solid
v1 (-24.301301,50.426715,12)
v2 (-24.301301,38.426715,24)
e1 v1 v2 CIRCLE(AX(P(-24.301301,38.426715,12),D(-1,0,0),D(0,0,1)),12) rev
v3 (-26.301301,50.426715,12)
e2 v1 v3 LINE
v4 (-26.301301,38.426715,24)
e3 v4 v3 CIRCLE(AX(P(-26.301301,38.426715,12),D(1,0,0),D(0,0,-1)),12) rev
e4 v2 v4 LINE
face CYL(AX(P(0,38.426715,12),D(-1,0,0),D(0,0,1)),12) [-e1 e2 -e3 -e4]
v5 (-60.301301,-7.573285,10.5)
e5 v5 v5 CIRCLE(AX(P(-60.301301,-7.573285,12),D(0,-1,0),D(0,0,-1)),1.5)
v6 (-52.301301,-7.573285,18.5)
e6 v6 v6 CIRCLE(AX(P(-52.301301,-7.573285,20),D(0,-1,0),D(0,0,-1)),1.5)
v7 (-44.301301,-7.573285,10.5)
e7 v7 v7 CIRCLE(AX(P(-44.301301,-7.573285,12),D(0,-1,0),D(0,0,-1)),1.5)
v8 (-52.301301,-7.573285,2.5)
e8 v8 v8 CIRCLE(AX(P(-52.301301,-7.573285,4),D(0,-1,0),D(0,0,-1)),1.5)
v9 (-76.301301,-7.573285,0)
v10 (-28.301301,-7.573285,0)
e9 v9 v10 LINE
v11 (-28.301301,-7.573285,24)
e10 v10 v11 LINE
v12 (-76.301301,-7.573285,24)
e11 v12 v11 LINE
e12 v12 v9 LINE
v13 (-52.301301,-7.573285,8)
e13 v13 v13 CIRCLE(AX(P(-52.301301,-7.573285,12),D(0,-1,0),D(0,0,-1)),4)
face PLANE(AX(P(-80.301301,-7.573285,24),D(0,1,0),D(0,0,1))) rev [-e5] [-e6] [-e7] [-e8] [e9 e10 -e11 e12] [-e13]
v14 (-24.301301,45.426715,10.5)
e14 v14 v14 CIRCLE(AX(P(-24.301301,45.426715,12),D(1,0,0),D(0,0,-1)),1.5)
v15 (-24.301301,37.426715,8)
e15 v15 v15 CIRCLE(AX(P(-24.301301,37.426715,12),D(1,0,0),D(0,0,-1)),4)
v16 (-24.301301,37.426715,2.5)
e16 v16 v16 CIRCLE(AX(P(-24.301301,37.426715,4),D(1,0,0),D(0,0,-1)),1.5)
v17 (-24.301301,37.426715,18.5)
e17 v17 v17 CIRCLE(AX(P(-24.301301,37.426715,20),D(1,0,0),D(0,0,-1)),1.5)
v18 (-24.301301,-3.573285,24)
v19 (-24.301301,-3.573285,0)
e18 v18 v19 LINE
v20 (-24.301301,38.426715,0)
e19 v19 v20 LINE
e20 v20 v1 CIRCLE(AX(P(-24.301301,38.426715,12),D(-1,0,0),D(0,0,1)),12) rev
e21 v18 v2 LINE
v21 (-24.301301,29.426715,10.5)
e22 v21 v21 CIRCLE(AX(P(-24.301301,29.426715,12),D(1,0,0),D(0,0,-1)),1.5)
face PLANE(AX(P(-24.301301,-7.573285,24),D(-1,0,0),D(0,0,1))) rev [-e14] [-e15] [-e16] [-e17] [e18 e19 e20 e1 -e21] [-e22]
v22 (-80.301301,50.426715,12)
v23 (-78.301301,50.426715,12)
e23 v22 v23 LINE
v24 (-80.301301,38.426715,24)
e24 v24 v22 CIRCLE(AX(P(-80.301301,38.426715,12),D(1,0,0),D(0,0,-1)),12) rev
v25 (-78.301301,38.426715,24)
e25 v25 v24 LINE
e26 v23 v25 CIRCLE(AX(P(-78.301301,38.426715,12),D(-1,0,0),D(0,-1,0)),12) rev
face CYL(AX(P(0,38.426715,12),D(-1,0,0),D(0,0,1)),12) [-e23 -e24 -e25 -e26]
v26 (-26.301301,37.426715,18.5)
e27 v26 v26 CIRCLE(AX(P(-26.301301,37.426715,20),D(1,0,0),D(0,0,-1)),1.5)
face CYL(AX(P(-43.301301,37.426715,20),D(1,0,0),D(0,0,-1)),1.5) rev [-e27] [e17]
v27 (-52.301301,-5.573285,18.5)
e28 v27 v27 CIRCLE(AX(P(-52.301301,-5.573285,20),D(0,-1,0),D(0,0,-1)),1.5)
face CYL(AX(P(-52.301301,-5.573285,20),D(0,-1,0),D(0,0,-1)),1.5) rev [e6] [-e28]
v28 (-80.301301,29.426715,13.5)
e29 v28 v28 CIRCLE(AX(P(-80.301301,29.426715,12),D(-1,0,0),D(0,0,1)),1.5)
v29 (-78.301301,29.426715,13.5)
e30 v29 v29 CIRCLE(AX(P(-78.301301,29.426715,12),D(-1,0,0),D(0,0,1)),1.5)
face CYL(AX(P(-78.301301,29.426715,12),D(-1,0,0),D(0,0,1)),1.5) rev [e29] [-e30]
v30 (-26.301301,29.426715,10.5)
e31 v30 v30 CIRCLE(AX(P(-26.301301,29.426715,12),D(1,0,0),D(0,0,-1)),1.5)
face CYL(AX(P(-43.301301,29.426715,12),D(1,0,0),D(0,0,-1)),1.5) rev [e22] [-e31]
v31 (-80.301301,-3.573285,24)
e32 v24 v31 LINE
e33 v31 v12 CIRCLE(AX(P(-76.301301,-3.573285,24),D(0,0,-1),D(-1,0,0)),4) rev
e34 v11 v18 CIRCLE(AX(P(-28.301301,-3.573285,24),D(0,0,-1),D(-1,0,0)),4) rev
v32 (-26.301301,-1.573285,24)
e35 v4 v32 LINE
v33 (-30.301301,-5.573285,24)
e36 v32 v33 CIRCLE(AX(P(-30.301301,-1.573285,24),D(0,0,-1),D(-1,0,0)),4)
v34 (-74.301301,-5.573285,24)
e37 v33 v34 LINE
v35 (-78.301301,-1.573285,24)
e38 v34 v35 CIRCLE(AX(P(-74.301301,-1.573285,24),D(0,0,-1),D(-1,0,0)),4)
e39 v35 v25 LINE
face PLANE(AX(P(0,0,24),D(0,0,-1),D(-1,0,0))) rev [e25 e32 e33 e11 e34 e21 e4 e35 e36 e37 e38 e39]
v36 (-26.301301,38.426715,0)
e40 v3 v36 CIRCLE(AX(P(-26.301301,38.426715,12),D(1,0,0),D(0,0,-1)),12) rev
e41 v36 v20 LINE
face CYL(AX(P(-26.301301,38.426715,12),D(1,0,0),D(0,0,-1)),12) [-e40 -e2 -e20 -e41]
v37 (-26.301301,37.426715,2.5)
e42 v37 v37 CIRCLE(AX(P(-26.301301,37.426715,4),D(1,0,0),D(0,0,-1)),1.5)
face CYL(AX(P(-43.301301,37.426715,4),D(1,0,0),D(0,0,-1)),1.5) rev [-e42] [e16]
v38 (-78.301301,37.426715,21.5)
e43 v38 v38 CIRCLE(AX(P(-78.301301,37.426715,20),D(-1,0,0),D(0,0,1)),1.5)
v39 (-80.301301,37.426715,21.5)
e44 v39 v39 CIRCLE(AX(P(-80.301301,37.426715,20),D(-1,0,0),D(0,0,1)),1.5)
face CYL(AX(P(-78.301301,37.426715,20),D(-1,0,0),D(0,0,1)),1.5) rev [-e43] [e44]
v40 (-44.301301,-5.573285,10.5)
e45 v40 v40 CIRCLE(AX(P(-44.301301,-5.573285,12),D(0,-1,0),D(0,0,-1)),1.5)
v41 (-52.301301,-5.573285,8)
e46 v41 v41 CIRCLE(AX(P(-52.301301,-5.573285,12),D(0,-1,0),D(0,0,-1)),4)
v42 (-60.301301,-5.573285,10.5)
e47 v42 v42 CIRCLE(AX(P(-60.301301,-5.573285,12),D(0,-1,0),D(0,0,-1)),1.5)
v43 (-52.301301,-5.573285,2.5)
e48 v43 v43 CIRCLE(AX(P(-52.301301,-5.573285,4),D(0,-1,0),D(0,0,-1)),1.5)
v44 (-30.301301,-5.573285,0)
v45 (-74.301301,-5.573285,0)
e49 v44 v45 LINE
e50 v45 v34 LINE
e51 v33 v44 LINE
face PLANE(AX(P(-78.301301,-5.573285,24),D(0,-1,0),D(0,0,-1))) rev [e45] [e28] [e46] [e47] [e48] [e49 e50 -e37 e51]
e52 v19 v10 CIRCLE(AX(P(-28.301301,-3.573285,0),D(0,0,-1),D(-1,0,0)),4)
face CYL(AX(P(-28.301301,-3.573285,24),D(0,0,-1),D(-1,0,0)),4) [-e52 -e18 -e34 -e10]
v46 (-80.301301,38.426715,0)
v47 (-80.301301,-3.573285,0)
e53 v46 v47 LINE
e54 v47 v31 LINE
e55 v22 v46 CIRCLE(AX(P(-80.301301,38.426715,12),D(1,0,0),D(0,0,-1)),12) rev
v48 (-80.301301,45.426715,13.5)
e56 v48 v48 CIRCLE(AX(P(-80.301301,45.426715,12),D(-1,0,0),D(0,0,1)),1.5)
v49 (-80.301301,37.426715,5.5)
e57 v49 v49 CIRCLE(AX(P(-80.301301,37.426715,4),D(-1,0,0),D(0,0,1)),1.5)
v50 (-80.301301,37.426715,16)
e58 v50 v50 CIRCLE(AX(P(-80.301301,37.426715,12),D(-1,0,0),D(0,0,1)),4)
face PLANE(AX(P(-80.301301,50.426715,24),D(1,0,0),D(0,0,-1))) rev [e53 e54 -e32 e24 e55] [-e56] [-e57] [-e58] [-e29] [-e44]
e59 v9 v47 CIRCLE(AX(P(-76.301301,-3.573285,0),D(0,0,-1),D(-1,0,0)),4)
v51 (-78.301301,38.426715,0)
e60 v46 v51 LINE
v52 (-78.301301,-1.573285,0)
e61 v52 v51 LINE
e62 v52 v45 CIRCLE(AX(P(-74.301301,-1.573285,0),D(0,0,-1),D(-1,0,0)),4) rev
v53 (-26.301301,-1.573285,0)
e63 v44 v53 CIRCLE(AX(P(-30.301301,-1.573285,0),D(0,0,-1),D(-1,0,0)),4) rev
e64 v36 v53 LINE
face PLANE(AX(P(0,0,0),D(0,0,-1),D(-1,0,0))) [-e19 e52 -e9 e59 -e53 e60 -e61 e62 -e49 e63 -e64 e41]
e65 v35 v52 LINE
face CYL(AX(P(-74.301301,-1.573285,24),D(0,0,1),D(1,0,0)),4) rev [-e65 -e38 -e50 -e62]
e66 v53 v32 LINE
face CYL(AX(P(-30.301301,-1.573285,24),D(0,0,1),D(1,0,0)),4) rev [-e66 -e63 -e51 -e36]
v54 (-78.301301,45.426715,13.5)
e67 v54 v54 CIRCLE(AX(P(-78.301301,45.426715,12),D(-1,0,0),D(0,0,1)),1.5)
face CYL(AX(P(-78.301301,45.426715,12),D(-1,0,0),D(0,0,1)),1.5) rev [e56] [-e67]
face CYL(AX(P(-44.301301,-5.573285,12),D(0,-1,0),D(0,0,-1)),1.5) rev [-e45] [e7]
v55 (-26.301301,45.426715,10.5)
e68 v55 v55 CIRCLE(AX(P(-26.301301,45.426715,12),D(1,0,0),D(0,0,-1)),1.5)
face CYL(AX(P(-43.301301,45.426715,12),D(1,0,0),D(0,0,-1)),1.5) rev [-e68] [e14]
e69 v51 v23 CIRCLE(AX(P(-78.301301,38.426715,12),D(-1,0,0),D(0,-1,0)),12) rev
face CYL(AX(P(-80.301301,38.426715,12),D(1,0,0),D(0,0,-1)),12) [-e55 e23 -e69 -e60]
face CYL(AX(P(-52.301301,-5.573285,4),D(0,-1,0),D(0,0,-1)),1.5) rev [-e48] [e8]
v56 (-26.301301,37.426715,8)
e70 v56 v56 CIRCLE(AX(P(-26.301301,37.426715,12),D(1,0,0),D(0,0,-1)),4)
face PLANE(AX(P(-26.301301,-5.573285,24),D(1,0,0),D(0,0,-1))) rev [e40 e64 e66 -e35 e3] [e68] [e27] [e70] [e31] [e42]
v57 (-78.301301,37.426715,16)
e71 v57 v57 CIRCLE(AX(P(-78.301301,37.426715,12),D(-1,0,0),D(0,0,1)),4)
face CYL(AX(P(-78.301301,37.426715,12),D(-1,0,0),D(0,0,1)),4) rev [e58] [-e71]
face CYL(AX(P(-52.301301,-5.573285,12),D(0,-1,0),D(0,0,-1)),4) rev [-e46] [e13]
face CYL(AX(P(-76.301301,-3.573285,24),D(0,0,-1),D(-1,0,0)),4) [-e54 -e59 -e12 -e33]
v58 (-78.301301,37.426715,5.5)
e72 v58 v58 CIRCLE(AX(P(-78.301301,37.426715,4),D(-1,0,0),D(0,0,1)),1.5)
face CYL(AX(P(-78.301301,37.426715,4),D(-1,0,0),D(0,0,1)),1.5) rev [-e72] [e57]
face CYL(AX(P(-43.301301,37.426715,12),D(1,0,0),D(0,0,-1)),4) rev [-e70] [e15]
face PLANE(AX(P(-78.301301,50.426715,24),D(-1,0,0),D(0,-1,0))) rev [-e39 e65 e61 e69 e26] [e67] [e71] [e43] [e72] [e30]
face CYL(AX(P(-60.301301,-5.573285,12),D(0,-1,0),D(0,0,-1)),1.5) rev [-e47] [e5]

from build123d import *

# Parameters (mm, degrees)
BOSS_EXTRUDE1_DEPTH = 24
SKETCH2_R           = 4
SKETCH2_R_2         = 1.5
CUT_EXTRUDE1_DEPTH  = 19
CUT_EXTRUDE2_START  = -2
SKETCH3_R           = 4
SKETCH3_R_2         = 1.5
CUT_EXTRUDE2_DEPTH  = 2
FILLET1_R           = 12
SKETCH4_R           = 1.5
SKETCH4_R_2         = 4
CUT_EXTRUDE4_DEPTH  = 2
FILLET2_R           = 4


with BuildPart() as part:
    # Sketch1 → Boss-Extrude1 (new body)
    with BuildSketch(Plane.XY):
        Polygon((-78.301300665, 50.426714514), (-78.301300665, -5.573285486), (-26.301300665, -5.573285486), (-26.301300665, 50.426714514), (-24.301300665, 50.426714514), (-24.301300665, -7.573285486), (-80.301300665, -7.573285486), (-80.301300665, 50.426714514), align=None)
    extrude(amount=BOSS_EXTRUDE1_DEPTH)

    # Sketch2 → Cut-Extrude1 (cut)
    with BuildSketch(Plane(origin=(-24.301300665, 0, 0), x_dir=(0, 0, -1), z_dir=(1, 0, 0))):
        with Locations((-12, 37.426714514)):
            Circle(SKETCH2_R)
        with Locations((-4, 37.426714514)):
            Circle(SKETCH2_R_2)
        with Locations((-12, 29.426714514)):
            Circle(SKETCH2_R_2)
        with Locations((-20, 37.426714514)):
            Circle(SKETCH2_R_2)
        with Locations((-12, 45.426714514)):
            Circle(SKETCH2_R_2)
    extrude(amount=-CUT_EXTRUDE1_DEPTH, mode=Mode.SUBTRACT)

    # Sketch3 → Cut-Extrude2 (cut)
    with BuildSketch(Plane.ZY.offset(80.301300665).offset(CUT_EXTRUDE2_START)):
        with Locations(Location((12, 37.426714514, 0), (0, 0, 180))):
            Circle(SKETCH3_R)
        with Locations(Location((20, 37.426714514, 0), (0, 0, 180))):
            Circle(SKETCH3_R_2)
        with Locations(Location((12, 29.426714514, 0), (0, 0, 180))):
            Circle(SKETCH3_R_2)
        with Locations(Location((4, 37.426714514, 0), (0, 0, 180))):
            Circle(SKETCH3_R_2)
        with Locations(Location((12, 45.426714514, 0), (0, 0, 180))):
            Circle(SKETCH3_R_2)
    extrude(amount=CUT_EXTRUDE2_DEPTH, mode=Mode.SUBTRACT)

    # Fillet1
    fillet1_edges = [part.edges().sort_by_distance(p)[0] for p in [
        (-25.301300665, 50.426714514, 0),
        (-79.301300665, 50.426714514, 0),
        (-79.301300665, 50.426714514, 24),
        (-25.301300665, 50.426714514, 24),
    ]]
    fillet(fillet1_edges, radius=FILLET1_R - 0.0001)  # a hair under: the kernel refuses the full size

    # Sketch4 → Cut-Extrude4 (cut)
    with BuildSketch(Plane.XZ.offset(7.573285486)):
        with Locations(Location((-44.301300665, 12, 0), (0, 0, 270))):
            Circle(SKETCH4_R)
        with Locations(Location((-52.301300665, 4, 0), (0, 0, 270))):
            Circle(SKETCH4_R)
        with Locations(Location((-60.301300665, 12, 0), (0, 0, 270))):
            Circle(SKETCH4_R)
        with Locations(Location((-52.301300665, 12, 0), (0, 0, 270))):
            Circle(SKETCH4_R_2)
        with Locations(Location((-52.301300665, 20, 0), (0, 0, 270))):
            Circle(SKETCH4_R)
    extrude(amount=-CUT_EXTRUDE4_DEPTH, mode=Mode.SUBTRACT)

    # Fillet2
    fillet2_edges = [part.edges().sort_by_distance(p)[0] for p in [
        (-78.301300665, -5.573285486, 12),
        (-26.301300665, -5.573285486, 12),
        (-24.301300665, -7.573285486, 12),
        (-80.301300665, -7.573285486, 12),
    ]]
    fillet(fillet2_edges, radius=FILLET2_R)


solid = part.part
